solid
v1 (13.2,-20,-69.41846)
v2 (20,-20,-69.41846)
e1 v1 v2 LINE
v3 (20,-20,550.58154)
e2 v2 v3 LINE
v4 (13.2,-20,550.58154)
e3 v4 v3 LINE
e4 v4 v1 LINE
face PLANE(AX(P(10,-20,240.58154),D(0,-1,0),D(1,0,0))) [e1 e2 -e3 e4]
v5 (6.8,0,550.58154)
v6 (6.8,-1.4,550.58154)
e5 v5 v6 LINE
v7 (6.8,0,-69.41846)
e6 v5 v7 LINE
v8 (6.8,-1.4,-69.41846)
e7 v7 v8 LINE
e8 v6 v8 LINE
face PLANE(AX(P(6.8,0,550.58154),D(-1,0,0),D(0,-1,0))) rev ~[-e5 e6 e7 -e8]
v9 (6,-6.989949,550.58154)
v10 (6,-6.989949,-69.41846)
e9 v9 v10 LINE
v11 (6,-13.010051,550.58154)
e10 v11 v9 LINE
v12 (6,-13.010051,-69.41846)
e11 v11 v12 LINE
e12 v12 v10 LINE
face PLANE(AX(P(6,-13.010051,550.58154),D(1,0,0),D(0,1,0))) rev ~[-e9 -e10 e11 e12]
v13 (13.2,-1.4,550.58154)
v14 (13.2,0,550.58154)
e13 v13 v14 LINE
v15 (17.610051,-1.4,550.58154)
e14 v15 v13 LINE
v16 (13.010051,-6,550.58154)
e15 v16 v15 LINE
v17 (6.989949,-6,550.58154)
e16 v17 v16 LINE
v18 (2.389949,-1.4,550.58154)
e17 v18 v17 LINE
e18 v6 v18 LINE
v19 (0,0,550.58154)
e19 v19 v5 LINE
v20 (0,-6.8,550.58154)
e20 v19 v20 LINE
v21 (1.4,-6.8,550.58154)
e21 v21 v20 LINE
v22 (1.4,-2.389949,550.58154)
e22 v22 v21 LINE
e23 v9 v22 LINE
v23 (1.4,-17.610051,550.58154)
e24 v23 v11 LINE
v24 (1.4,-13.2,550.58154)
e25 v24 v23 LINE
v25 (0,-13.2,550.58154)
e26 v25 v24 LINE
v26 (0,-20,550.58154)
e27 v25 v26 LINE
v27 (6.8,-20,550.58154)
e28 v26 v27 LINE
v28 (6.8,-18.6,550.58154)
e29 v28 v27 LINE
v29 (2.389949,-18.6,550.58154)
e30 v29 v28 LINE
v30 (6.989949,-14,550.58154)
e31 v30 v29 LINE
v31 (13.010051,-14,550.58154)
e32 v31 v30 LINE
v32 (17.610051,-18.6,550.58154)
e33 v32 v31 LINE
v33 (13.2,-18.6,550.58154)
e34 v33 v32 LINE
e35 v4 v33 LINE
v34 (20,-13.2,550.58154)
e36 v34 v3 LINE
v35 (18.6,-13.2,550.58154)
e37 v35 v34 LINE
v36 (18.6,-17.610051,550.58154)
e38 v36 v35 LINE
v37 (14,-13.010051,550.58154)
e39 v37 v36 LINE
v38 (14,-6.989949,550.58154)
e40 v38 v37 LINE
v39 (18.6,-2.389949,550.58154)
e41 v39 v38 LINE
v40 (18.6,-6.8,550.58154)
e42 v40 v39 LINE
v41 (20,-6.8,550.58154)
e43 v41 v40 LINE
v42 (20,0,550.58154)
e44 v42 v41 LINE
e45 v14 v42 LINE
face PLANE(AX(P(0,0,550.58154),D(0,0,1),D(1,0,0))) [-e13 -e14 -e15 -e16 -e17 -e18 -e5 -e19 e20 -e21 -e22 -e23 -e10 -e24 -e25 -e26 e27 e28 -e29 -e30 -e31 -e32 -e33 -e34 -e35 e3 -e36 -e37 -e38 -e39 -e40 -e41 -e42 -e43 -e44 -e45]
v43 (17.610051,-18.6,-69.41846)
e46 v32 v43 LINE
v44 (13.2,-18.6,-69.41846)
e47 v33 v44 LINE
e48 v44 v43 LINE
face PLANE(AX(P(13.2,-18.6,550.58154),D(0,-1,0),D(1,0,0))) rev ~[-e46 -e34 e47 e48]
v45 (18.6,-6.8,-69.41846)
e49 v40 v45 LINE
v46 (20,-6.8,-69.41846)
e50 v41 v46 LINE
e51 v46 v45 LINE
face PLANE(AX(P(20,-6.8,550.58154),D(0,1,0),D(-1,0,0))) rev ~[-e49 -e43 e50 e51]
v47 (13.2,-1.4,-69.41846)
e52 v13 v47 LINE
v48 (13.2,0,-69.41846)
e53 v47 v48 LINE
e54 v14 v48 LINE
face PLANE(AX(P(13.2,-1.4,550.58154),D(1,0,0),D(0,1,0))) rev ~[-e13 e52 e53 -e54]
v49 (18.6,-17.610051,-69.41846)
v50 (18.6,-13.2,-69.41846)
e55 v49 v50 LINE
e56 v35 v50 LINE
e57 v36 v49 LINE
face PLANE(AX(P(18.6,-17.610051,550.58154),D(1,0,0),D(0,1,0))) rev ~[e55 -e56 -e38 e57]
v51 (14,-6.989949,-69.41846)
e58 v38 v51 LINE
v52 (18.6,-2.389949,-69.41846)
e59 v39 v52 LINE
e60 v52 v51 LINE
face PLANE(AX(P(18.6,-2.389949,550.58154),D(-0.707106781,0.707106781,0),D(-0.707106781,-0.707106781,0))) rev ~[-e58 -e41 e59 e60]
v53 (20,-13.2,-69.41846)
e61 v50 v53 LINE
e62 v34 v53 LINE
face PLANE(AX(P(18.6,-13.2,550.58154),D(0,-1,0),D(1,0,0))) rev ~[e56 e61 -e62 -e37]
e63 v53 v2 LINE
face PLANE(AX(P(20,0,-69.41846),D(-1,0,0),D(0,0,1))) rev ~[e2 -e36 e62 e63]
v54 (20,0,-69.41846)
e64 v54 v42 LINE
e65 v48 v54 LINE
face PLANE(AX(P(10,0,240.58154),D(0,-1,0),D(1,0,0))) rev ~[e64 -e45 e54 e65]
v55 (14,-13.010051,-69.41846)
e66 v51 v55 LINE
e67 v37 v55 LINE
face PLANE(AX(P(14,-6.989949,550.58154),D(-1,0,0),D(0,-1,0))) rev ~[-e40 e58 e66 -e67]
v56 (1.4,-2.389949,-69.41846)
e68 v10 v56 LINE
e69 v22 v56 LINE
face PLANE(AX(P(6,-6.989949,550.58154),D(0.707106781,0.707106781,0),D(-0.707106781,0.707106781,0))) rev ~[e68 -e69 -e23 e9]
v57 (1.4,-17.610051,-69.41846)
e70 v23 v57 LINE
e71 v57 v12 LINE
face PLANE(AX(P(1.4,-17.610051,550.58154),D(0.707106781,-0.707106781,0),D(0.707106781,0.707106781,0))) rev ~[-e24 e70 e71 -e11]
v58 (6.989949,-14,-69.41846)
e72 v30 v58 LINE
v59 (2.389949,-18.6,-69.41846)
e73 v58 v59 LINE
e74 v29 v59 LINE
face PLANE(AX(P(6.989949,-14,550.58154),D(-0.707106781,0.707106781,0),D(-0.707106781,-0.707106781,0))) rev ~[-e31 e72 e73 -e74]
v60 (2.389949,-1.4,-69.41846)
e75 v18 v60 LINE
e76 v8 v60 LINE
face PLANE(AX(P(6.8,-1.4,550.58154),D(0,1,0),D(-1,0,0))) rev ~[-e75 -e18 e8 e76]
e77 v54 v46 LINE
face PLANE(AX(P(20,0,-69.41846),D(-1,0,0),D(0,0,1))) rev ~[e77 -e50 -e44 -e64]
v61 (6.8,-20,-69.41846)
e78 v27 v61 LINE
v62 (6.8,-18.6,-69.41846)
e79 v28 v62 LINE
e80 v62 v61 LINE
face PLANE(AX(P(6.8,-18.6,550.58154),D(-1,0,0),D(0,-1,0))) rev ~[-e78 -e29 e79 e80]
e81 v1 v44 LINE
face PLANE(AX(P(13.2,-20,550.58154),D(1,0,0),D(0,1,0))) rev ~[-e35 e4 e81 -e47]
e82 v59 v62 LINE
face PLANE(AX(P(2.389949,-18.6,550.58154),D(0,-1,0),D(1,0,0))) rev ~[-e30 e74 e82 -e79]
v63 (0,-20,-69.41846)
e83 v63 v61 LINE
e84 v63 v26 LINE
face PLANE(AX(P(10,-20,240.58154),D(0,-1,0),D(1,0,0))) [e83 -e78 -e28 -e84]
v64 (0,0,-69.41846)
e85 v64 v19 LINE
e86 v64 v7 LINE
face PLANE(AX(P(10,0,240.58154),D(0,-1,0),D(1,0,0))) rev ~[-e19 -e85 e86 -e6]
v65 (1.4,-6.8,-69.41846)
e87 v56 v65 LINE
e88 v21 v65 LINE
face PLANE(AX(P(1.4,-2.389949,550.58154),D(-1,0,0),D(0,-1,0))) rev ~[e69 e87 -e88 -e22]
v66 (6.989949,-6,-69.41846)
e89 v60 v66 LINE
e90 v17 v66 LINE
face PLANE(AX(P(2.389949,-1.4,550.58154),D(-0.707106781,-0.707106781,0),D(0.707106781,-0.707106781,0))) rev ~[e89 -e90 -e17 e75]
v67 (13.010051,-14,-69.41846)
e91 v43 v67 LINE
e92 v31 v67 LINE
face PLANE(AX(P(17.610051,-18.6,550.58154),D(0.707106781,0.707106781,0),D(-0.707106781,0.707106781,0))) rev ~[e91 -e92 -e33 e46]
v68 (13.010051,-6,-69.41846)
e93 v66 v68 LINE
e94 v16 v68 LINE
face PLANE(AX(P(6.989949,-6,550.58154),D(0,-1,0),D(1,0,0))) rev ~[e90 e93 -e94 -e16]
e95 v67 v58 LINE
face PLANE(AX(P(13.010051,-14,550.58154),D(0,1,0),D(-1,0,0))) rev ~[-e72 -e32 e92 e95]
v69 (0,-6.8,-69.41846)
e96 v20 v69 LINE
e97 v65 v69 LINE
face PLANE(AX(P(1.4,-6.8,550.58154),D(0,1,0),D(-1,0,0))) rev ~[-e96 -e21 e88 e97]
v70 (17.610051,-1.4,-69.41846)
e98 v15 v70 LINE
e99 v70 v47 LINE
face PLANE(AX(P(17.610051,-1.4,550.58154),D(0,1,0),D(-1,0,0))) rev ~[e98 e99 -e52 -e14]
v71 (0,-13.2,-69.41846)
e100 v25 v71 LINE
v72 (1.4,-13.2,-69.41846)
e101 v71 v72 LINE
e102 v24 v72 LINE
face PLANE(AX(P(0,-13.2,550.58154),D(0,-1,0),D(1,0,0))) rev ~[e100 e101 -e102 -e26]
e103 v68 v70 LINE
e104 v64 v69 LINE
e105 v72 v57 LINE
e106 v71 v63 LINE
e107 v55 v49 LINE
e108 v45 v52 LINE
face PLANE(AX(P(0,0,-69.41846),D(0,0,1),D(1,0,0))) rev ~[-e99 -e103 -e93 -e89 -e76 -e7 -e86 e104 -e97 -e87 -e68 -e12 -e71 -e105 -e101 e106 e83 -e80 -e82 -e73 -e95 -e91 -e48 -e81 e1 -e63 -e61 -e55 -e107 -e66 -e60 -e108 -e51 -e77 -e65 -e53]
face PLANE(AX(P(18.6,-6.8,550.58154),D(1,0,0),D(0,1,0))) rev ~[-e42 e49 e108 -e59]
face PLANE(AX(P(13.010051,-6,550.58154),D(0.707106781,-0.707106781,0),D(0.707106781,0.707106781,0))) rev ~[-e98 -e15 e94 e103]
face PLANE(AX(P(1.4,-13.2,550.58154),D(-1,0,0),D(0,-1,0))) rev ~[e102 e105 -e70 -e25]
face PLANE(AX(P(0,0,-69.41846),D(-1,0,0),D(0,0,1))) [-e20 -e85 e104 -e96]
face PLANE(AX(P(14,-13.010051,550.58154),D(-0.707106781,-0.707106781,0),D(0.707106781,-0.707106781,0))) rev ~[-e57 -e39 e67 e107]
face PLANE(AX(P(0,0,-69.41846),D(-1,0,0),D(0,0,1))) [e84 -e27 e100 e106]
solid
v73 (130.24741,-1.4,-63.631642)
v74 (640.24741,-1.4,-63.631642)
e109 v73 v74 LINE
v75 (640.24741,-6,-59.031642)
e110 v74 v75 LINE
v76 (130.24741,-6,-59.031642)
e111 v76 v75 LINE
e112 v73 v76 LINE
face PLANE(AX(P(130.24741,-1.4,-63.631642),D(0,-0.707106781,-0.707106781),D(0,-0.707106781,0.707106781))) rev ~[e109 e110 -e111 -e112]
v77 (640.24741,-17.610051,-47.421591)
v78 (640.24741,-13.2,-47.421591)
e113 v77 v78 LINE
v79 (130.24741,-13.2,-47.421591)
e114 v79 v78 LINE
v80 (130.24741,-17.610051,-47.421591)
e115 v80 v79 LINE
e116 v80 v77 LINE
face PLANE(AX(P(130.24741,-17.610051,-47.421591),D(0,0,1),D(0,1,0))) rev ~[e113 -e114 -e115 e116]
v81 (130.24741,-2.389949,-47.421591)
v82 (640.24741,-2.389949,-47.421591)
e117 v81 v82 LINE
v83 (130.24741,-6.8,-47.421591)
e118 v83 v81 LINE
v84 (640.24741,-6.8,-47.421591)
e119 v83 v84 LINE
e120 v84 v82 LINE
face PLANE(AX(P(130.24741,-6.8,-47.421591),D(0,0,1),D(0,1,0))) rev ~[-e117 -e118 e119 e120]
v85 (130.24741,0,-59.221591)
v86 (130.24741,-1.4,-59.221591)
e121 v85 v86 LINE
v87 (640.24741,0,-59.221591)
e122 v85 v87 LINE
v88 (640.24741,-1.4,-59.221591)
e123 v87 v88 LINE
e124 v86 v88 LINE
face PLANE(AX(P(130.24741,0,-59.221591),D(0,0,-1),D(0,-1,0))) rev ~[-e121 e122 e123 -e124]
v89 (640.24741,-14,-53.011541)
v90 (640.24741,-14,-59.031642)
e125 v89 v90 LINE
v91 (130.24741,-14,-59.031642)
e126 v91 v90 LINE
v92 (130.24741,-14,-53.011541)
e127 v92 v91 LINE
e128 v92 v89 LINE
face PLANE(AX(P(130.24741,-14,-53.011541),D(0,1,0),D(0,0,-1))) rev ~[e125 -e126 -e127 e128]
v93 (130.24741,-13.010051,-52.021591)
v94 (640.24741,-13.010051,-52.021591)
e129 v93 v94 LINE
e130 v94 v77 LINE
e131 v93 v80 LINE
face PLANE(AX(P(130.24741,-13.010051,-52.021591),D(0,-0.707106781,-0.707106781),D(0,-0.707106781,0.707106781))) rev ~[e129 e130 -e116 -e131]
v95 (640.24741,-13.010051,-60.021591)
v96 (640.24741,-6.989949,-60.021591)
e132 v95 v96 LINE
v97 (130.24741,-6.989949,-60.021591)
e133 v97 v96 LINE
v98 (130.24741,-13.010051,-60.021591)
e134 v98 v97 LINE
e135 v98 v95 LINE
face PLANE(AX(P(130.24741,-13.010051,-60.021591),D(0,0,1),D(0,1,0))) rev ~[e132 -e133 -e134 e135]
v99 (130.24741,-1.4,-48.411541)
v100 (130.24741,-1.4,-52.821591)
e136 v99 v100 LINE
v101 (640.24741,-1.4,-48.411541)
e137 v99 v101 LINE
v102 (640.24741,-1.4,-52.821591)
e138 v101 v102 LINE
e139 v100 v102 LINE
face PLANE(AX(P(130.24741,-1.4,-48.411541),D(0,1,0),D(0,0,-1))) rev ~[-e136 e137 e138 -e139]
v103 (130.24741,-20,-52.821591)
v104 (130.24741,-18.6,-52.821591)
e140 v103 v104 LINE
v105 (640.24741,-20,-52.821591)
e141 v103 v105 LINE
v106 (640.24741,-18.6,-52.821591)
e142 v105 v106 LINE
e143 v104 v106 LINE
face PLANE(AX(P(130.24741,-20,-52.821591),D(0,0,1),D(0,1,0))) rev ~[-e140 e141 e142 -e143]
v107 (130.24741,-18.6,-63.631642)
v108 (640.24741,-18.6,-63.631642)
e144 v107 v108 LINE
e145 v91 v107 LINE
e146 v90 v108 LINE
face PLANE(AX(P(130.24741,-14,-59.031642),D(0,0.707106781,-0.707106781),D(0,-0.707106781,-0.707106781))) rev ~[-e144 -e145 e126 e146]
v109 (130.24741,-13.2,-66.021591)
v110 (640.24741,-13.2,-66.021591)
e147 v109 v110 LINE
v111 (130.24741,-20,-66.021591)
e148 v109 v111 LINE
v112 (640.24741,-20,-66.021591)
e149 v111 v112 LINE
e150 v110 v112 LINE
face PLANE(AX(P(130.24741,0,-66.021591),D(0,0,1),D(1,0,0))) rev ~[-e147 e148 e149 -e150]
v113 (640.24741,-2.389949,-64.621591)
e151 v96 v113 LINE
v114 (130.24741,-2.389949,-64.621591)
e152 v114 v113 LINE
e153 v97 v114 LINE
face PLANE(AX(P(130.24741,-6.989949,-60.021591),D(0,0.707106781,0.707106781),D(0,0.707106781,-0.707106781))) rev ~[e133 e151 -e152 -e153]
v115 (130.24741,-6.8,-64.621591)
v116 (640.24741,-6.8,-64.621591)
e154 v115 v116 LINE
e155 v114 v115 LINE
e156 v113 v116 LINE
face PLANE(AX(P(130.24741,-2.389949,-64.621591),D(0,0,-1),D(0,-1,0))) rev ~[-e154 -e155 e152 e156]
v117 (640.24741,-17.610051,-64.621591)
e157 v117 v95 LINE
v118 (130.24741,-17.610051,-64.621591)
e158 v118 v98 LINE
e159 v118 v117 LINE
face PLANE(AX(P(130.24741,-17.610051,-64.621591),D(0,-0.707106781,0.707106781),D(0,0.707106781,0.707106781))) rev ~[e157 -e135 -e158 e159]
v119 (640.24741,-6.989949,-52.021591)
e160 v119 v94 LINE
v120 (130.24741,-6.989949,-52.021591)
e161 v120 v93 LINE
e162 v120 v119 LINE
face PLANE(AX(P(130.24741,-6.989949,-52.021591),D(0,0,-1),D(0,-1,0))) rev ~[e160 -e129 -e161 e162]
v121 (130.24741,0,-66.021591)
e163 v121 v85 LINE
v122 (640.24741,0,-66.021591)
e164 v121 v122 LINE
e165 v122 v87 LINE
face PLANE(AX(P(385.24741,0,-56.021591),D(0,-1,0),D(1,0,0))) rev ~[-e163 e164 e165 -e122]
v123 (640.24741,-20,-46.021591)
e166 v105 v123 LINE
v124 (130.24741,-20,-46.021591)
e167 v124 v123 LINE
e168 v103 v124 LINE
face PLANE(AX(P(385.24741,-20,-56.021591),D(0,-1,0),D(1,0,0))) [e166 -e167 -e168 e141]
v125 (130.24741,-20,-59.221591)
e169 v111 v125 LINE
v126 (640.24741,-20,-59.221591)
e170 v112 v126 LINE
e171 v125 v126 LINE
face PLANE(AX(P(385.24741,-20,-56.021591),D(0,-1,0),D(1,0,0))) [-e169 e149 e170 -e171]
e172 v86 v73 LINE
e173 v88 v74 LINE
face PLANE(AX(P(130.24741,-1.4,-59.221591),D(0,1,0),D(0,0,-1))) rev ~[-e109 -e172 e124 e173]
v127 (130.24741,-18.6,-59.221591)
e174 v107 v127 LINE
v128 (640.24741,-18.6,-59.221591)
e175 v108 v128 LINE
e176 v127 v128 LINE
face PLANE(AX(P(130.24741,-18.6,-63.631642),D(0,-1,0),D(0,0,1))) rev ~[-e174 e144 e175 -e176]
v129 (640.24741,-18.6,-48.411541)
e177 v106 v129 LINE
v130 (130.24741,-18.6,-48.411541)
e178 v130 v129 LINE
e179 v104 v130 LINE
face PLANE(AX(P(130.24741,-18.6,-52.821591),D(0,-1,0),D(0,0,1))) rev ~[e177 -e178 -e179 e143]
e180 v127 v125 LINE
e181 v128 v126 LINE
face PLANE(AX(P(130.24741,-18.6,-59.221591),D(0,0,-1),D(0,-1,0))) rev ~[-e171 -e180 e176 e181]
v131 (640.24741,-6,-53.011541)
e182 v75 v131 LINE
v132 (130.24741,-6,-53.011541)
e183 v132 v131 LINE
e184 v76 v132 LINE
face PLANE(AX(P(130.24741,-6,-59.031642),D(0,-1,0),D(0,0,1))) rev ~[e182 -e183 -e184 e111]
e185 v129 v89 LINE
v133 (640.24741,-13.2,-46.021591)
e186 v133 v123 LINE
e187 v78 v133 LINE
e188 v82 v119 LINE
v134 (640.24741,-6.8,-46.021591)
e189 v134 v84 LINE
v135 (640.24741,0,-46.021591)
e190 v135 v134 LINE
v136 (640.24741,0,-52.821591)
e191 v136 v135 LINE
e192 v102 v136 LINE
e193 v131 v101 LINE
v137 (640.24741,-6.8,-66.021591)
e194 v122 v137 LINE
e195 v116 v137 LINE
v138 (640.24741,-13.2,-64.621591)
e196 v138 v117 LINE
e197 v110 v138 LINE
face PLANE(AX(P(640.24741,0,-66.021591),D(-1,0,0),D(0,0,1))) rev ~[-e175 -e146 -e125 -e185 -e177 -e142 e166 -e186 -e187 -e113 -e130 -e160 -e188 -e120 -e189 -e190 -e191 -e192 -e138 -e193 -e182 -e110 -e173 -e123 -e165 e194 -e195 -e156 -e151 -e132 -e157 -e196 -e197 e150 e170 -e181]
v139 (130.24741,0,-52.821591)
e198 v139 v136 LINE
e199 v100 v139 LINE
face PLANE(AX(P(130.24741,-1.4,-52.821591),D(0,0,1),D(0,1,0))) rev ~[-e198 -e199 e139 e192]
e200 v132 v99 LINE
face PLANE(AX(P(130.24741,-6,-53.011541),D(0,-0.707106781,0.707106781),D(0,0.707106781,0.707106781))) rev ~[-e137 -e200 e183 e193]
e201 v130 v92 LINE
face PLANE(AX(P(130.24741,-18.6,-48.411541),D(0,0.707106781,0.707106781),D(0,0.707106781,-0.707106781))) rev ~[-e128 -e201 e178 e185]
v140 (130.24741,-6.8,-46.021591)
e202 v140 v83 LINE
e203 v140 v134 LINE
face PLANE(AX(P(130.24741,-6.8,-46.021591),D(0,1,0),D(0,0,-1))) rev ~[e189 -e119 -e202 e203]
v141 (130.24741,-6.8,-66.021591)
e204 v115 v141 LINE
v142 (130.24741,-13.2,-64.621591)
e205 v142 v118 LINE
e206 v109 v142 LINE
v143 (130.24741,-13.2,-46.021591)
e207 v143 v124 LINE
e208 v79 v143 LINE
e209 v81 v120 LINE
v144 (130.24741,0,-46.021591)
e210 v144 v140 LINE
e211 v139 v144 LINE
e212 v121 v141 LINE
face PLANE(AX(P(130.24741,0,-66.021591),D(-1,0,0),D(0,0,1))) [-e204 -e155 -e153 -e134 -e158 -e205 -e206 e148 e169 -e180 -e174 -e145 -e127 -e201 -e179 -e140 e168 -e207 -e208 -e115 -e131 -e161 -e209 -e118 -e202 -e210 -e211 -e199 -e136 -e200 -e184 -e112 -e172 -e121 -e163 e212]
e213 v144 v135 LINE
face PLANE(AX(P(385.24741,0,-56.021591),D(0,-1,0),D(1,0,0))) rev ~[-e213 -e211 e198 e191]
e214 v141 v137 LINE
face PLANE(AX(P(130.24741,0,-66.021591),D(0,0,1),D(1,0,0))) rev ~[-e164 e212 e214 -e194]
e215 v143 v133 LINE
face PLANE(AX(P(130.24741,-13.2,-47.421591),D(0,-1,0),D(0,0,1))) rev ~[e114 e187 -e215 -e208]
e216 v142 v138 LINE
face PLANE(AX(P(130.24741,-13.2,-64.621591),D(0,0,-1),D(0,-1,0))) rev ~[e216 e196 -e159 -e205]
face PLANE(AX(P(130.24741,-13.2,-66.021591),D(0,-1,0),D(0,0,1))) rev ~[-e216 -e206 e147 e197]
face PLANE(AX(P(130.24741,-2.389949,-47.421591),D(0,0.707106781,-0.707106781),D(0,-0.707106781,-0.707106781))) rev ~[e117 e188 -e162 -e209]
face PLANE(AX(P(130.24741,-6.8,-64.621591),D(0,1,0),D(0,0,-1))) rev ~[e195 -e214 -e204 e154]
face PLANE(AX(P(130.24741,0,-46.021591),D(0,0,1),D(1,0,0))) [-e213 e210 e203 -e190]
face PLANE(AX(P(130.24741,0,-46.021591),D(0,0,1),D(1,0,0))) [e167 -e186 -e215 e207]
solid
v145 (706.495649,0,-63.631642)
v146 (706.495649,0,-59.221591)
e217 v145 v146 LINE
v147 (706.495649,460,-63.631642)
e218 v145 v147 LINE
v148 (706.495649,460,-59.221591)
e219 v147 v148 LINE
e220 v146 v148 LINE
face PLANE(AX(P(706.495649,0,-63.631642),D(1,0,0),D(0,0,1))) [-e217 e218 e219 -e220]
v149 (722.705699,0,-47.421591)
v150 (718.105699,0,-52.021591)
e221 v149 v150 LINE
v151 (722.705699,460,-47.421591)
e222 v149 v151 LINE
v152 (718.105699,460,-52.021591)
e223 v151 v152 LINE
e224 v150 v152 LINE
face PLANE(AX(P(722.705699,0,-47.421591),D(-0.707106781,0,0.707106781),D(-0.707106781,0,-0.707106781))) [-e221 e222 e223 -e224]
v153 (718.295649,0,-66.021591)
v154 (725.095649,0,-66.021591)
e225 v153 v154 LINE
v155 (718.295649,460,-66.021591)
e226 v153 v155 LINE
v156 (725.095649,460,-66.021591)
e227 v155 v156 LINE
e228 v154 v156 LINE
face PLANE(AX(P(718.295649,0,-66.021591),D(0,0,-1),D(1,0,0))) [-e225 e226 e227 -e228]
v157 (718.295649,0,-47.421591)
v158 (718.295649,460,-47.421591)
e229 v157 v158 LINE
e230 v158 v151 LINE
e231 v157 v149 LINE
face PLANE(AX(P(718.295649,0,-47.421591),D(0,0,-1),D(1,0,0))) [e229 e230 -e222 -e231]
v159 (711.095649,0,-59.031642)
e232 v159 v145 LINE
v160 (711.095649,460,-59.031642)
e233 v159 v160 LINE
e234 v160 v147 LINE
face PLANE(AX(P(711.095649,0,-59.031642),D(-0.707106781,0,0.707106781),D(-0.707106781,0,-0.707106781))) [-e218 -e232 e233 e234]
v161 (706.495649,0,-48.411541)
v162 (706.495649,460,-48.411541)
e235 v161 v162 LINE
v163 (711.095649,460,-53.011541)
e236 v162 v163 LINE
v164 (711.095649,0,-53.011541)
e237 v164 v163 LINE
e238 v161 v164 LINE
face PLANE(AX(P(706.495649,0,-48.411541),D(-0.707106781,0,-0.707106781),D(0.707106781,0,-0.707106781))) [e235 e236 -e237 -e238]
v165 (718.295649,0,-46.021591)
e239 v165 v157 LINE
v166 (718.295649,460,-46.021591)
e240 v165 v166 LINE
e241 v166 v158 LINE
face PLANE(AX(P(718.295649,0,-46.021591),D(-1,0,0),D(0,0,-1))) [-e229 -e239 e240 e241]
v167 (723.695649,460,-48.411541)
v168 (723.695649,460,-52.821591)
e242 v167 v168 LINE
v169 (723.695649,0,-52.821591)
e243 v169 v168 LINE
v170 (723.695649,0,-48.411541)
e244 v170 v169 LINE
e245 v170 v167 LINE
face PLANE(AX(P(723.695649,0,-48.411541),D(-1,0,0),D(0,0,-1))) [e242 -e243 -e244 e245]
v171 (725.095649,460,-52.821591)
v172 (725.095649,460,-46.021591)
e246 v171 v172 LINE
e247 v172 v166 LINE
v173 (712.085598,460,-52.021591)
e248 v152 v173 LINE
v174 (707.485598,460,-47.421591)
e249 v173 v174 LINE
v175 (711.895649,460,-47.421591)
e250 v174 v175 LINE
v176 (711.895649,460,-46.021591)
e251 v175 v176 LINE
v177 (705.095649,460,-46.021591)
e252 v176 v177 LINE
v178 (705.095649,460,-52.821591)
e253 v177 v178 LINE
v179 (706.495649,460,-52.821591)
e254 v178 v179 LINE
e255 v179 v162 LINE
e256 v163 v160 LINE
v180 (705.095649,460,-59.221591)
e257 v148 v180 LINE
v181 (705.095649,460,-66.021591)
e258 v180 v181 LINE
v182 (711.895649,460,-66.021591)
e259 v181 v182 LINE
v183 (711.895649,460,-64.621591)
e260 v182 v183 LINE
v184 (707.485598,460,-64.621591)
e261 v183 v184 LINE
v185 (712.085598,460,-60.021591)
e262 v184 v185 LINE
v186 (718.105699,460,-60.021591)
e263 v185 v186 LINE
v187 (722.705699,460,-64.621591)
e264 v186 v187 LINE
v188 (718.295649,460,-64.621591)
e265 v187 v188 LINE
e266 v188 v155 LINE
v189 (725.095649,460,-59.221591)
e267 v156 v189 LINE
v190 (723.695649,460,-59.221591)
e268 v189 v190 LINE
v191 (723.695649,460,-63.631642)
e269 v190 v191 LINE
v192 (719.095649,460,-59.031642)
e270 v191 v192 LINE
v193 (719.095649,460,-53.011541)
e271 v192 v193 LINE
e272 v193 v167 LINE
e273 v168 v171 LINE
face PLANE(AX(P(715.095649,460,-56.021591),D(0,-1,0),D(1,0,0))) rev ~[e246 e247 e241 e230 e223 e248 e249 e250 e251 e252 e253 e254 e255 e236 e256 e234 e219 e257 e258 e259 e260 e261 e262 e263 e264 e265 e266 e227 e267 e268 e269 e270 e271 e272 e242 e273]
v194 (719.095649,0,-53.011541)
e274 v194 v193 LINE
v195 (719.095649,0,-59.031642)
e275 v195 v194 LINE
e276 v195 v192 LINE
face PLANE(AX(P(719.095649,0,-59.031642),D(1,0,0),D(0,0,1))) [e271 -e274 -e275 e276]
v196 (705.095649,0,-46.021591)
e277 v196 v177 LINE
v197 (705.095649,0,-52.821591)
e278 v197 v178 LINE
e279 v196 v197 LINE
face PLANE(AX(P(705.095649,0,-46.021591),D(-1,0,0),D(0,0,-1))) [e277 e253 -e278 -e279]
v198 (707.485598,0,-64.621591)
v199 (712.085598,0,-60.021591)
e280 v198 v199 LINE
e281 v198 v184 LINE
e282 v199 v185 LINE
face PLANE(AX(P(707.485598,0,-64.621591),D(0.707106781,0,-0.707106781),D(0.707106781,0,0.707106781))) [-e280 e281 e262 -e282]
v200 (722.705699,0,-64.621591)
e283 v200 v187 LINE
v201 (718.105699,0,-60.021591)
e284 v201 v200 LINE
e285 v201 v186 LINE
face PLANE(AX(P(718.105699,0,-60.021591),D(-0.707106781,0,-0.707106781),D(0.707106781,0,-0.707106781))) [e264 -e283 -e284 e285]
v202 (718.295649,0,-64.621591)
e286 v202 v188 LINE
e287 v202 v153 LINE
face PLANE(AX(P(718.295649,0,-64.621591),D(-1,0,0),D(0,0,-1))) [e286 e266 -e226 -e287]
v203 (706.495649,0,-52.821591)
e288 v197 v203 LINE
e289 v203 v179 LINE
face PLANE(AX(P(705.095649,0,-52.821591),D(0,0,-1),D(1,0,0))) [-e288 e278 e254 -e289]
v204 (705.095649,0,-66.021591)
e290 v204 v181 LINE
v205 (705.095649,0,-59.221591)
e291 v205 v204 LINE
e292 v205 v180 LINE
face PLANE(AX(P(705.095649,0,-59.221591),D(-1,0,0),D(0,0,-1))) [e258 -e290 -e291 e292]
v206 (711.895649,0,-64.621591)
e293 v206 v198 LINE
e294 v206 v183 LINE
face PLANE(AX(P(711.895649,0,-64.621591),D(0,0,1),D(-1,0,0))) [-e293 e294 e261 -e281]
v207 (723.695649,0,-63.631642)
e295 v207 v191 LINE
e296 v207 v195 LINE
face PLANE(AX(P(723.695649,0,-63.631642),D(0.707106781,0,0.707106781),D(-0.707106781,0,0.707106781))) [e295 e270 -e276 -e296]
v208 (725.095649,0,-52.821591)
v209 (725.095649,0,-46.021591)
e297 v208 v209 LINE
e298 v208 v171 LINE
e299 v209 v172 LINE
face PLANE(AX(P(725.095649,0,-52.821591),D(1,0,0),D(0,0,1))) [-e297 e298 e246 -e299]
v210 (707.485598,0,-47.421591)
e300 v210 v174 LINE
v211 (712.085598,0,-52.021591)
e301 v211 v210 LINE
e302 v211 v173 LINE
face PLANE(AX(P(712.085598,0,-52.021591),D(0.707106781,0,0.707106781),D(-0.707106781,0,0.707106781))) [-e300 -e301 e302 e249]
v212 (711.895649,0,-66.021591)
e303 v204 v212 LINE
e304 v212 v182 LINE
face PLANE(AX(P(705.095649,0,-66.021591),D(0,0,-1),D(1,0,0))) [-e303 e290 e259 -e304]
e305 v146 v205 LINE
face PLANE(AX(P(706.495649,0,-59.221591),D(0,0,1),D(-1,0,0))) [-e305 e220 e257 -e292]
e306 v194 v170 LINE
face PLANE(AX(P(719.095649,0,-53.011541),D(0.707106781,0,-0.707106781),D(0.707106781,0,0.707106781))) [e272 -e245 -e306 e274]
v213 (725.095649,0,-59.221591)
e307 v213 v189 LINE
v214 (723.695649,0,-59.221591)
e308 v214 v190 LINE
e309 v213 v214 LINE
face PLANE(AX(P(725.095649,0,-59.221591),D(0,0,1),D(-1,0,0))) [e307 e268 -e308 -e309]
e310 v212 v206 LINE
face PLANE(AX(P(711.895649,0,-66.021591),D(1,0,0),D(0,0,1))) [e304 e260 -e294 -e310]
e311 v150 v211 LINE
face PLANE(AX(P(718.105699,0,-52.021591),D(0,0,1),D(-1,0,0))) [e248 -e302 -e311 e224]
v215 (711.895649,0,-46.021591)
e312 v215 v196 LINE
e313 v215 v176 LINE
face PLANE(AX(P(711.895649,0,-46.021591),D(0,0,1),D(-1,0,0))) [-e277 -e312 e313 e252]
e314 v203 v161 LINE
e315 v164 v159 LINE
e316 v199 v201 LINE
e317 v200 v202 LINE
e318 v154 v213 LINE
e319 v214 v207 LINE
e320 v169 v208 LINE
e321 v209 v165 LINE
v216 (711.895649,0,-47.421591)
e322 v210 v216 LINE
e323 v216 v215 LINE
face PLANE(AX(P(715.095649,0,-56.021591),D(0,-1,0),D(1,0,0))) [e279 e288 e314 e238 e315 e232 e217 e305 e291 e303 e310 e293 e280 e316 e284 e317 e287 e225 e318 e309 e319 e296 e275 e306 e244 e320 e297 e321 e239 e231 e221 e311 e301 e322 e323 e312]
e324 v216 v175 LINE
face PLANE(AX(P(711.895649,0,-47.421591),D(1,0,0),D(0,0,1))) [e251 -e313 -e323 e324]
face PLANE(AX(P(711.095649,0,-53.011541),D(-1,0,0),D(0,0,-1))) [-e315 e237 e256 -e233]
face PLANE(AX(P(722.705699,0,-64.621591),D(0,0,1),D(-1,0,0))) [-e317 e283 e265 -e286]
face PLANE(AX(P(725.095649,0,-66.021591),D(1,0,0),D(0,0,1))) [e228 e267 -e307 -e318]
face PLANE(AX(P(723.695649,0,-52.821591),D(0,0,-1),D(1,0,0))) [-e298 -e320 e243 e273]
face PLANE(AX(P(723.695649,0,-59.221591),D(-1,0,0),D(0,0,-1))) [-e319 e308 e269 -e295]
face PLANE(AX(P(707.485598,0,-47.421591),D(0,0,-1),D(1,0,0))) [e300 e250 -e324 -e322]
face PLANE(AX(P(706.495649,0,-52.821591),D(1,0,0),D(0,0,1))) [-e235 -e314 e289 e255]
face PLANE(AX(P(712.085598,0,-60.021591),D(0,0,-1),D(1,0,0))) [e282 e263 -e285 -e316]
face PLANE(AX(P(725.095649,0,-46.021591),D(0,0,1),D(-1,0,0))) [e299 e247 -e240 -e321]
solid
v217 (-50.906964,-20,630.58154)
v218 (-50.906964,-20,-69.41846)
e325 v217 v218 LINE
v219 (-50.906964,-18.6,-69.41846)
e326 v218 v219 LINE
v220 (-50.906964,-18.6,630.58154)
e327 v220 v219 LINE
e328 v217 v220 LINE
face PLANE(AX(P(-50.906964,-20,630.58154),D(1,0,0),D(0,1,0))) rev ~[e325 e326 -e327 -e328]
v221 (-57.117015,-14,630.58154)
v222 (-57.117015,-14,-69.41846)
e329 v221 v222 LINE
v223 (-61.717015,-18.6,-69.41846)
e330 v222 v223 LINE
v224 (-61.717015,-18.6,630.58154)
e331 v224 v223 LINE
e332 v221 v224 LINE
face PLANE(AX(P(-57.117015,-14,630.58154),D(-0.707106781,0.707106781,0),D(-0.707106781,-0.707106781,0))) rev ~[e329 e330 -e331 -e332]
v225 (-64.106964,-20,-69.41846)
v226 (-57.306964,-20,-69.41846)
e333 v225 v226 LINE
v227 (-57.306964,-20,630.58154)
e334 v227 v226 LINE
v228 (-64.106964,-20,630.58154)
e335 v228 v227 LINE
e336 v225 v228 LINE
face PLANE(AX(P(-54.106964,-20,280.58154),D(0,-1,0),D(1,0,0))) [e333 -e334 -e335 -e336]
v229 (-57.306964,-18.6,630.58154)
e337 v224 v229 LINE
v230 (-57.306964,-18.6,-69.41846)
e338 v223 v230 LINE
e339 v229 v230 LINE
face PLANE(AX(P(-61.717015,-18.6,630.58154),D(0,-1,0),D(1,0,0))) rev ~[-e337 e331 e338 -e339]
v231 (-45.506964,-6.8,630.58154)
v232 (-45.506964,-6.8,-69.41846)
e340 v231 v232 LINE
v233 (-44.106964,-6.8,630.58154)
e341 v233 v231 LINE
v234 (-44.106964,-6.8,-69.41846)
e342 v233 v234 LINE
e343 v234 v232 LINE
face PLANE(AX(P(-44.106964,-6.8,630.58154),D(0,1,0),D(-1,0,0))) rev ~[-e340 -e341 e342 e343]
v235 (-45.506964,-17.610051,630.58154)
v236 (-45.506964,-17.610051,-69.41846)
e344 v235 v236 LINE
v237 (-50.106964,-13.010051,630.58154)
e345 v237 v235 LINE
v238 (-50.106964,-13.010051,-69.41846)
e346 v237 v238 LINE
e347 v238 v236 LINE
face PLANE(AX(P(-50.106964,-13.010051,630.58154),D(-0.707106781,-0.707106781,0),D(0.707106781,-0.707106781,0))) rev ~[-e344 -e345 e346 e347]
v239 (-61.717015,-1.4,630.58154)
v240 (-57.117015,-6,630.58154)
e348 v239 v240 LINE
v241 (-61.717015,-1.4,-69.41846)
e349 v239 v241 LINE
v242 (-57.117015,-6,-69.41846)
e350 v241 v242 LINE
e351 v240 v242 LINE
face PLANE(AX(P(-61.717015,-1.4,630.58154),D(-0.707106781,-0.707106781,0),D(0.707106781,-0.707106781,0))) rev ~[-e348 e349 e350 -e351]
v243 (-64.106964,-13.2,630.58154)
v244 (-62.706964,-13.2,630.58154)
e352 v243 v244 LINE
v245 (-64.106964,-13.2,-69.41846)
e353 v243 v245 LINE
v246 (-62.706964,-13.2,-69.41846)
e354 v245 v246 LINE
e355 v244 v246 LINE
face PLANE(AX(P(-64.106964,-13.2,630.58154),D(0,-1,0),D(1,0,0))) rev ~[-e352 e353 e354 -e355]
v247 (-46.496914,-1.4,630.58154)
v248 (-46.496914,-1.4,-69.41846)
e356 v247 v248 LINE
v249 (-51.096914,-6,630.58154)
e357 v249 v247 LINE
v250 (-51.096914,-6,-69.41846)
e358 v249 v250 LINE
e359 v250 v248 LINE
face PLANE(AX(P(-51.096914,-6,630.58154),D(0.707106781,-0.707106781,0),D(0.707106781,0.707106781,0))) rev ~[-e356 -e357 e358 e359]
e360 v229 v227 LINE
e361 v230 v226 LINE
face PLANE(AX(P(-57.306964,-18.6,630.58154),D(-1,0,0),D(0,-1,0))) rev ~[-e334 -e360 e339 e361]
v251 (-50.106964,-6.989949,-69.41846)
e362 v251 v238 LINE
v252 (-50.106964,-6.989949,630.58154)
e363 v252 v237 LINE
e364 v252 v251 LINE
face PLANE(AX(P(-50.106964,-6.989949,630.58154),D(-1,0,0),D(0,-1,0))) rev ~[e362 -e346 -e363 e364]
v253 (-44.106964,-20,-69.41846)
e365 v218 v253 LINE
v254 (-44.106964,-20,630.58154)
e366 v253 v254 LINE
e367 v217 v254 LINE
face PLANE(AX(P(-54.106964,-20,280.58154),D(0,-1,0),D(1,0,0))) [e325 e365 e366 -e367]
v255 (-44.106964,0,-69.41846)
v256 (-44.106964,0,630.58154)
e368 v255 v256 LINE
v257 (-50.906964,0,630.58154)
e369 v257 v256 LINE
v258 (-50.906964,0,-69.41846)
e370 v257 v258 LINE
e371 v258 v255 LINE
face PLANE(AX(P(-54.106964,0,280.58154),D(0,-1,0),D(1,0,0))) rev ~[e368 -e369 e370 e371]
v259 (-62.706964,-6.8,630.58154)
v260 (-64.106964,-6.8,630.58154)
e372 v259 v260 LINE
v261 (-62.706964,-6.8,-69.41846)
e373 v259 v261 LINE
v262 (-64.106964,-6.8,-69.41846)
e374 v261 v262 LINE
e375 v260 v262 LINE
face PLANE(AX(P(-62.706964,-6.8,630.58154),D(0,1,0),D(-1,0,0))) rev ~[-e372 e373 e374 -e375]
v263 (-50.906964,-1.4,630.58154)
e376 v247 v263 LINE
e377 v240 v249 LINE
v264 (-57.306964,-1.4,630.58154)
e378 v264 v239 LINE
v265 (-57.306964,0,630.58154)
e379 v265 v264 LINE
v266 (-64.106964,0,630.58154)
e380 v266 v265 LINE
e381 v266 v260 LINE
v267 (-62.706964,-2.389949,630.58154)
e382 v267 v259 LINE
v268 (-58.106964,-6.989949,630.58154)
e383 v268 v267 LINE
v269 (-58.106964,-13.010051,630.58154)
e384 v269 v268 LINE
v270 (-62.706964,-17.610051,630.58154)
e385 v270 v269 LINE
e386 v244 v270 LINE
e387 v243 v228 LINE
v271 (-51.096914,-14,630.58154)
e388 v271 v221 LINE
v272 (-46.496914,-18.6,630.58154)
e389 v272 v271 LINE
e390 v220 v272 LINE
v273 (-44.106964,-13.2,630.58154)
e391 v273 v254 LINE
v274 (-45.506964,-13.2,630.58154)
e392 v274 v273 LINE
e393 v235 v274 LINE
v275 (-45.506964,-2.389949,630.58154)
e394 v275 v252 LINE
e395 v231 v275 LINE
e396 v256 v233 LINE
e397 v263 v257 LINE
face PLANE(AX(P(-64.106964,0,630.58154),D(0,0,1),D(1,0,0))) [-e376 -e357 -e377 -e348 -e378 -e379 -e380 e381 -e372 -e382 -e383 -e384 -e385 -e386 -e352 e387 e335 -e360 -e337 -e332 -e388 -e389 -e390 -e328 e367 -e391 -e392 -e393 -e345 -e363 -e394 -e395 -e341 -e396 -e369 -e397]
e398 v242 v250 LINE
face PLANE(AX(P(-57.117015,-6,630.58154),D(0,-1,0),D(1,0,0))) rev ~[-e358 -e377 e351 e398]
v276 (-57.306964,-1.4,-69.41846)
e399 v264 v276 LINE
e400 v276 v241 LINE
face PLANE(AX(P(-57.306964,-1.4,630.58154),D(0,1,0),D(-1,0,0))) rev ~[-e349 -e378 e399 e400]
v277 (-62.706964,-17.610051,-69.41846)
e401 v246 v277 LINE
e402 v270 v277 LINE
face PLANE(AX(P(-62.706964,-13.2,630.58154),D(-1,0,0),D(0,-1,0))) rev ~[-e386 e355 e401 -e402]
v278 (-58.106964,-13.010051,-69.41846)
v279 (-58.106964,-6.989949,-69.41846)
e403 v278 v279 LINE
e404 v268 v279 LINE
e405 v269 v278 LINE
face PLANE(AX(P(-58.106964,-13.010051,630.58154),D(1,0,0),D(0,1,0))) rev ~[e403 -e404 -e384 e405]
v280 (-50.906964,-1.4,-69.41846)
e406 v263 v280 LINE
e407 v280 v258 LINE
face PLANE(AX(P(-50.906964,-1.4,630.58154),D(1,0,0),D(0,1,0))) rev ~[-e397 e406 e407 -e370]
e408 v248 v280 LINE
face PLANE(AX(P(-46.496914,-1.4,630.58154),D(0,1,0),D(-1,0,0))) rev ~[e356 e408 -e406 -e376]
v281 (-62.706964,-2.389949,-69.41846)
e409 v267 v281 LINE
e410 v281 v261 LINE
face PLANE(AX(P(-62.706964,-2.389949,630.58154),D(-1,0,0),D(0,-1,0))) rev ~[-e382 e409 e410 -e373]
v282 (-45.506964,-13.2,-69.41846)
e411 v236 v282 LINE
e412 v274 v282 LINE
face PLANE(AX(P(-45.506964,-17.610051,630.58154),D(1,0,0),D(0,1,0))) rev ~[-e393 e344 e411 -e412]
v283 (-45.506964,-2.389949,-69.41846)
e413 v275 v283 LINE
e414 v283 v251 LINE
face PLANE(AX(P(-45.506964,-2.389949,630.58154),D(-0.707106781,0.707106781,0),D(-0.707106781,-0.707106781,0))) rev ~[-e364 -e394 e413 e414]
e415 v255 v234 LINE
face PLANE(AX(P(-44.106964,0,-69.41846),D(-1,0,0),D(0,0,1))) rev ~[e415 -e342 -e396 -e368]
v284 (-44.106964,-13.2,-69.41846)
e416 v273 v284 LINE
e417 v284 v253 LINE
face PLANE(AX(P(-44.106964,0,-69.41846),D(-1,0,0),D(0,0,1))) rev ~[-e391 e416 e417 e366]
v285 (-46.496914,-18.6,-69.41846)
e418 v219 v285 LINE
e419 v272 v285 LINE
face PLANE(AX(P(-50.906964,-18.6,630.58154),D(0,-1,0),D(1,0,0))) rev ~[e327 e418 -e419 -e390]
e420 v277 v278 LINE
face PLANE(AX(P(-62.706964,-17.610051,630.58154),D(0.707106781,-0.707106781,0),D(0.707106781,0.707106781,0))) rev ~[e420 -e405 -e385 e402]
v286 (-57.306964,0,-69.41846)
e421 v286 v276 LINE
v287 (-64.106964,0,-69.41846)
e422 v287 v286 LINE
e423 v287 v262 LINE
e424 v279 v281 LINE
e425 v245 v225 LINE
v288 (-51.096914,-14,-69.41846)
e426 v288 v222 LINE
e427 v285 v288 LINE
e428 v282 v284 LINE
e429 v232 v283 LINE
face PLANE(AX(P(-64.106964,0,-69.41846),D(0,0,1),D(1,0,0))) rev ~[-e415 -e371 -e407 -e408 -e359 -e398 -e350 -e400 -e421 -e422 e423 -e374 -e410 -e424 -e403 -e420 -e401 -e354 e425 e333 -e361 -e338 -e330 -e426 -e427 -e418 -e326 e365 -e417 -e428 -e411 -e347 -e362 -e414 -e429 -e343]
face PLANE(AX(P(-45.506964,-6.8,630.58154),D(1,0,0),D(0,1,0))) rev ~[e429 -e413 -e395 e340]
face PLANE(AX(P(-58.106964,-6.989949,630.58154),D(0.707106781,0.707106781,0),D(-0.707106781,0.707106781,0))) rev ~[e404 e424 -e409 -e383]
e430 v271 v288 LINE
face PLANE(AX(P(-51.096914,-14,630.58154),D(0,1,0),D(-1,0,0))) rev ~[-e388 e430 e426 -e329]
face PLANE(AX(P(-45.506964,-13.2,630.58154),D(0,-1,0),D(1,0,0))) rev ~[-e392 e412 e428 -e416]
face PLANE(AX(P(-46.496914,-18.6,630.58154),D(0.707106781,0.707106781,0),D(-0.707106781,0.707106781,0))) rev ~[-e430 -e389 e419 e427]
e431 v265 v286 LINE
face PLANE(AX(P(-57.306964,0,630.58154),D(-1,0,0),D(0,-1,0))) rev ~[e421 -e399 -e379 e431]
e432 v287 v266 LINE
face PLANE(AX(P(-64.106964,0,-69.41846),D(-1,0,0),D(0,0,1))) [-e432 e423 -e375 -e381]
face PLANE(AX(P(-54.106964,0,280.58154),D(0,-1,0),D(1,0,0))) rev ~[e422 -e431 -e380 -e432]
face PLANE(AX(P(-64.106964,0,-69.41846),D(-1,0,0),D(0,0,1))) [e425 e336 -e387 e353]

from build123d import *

# Parameters (mm, degrees)
F0_W     = 20
F0_H     = 700
F1_DEPTH = 20
F0_W_2   = 510
F0_H_2   = 20
F0_H_3   = 620
F2_DEPTH = 460
F4_DEPTH = 620
F6_DEPTH = 700
F8_DEPTH = 510


# Not quite as in the source:
# - a feature names something its author has since deleted; it is built from what else it names


with BuildPart() as f1:
    # F0 (on Front) → F1 (new body)
    with BuildSketch(Plane.XZ):
        with Locations((-54.1069640219, 280.5815398693)):
            Rectangle(F0_W, F0_H)
    extrude(amount=F1_DEPTH)

    # F5 (on face) → F6 (cut, through all)
    with BuildSketch(Plane.XY.offset(630.5815398693)):
        Polygon((-62.7069640219, -6.8), (-64.1069640219, -6.8), (-64.1069640219, -13.2), (-62.7069640219, -13.2), (-62.7069640219, -17.6100505063), (-58.1069640219, -13.0100505063), (-58.1069640219, -10), (-58.1069640219, -6.9899494937), (-62.7069640219, -2.3899494937), align=None)
        Polygon((-50.9069640219, 0), (-57.3069640219, 0), (-57.3069640219, -1.4), (-61.7170145283, -1.4), (-57.1170145283, -6), (-54.1069640219, -6), (-51.0969135156, -6), (-46.4969135156, -1.4), (-50.9069640219, -1.4), align=None)
        Polygon((-44.1069640219, -13.2), (-44.1069640219, -6.8), (-45.5069640219, -6.8), (-45.5069640219, -2.3899494937), (-50.1069640219, -6.9899494937), (-50.1069640219, -10), (-50.1069640219, -13.0100505063), (-45.5069640219, -17.6100505063), (-45.5069640219, -13.2), align=None)
        Polygon((-57.3069640219, -18.6), (-57.3069640219, -20), (-50.9069640219, -20), (-50.9069640219, -18.6), (-46.4969135156, -18.6), (-51.0969135156, -14), (-54.1069640219, -14), (-57.1170145283, -14), (-61.7170145283, -18.6), align=None)
    extrude(amount=-F6_DEPTH, mode=Mode.SUBTRACT)


with BuildPart() as f1b:
    # F0 (on Front) → F1, piece 2 (new body)
    with BuildSketch(Plane.XZ):
        with Locations((385.2474099398, -56.0215914249)):
            Rectangle(F0_W_2, F0_H_2)
    extrude(amount=F1_DEPTH)

    # F7 (on face) → F8 (cut, through all)
    with BuildSketch(Plane(origin=(130.2474099398, 0, 0), x_dir=(0, -1, 0), z_dir=(-1, 0, 0))):
        Polygon((13.2, -46.0215914249), (6.8, -46.0215914249), (6.8, -47.4215914249), (2.3899494937, -47.4215914249), (6.9899494937, -52.0215914249), (10, -52.0215914249), (13.0100505063, -52.0215914249), (17.6100505063, -47.4215914249), (13.2, -47.4215914249), align=None)
        Polygon((20, -59.2215914249), (20, -52.8215914249), (18.6, -52.8215914249), (18.6, -48.4115409186), (14, -53.0115409186), (14, -56.0215914249), (14, -59.0316419313), (18.6, -63.6316419313), (18.6, -59.2215914249), align=None)
        Polygon((6.8, -64.6215914249), (6.8, -66.0215914249), (13.2, -66.0215914249), (13.2, -64.6215914249), (17.6100505063, -64.6215914249), (13.0100505063, -60.0215914249), (10, -60.0215914249), (6.9899494937, -60.0215914249), (2.3899494937, -64.6215914249), align=None)
        Polygon((1.4, -52.8215914249), (0, -52.8215914249), (0, -59.2215914249), (1.4, -59.2215914249), (1.4, -63.6316419313), (6, -59.0316419313), (6, -56.0215914249), (6, -53.0115409186), (1.4, -48.4115409186), align=None)
    extrude(amount=-F8_DEPTH, mode=Mode.SUBTRACT)


with BuildPart() as f1c:
    # F0 (on Front) → F1, piece 3 (new body)
    with BuildSketch(Plane.XZ):
        with Locations((10, 240.5815398693)):
            Rectangle(F0_W, F0_H_3)
    extrude(amount=F1_DEPTH)

    # F3 (on face) → F4 (cut, through all)
    with BuildSketch(Plane.XY.offset(550.5815398693)):
        Polygon((13.2, 0), (6.8, 0), (6.8, -1.4), (2.3899494937, -1.4), (6.9899494937, -6), (10, -6), (13.0100505063, -6), (17.6100505063, -1.4), (13.2, -1.4), align=None)
        Polygon((20, -13.2), (20, -6.8), (18.6, -6.8), (18.6, -2.3899494937), (14, -6.9899494937), (14, -10), (14, -13.0100505063), (18.6, -17.6100505063), (18.6, -13.2), align=None)
        Polygon((6.8, -18.6), (6.8, -20), (13.2, -20), (13.2, -18.6), (17.6100505063, -18.6), (13.0100505063, -14), (10, -14), (6.9899494937, -14), (2.3899494937, -18.6), align=None)
        Polygon((1.4, -6.8), (0, -6.8), (0, -13.2), (1.4, -13.2), (1.4, -17.6100505063), (6, -13.0100505063), (6, -10), (6, -6.9899494937), (1.4, -2.3899494937), align=None)
    extrude(amount=-F4_DEPTH, mode=Mode.SUBTRACT)


with BuildPart() as f2:
    # F0 (on Front) → F2 (new body)
    with BuildSketch(Plane.XZ):
        Polygon((705.0956487656, -59.2215914249), (705.0956487656, -66.0215914249), (711.8956487656, -66.0215914249), (711.8956487656, -64.6215914249), (707.4855982592, -64.6215914249), (712.0855982592, -60.0215914249), (715.0956487656, -60.0215914249), (718.1056992719, -60.0215914249), (722.7056992719, -64.6215914249), (718.2956487656, -64.6215914249), (718.2956487656, -66.0215914249), (725.0956487656, -66.0215914249), (725.0956487656, -59.2215914249), (723.6956487656, -59.2215914249), (723.6956487656, -63.6316419313), (719.0956487656, -59.0316419313), (719.0956487656, -56.0215914249), (719.0956487656, -53.0115409186), (723.6956487656, -48.4115409186), (723.6956487656, -52.8215914249), (725.0956487656, -52.8215914249), (725.0956487656, -46.0215914249), (718.2956487656, -46.0215914249), (718.2956487656, -47.4215914249), (722.7056992719, -47.4215914249), (718.1056992719, -52.0215914249), (715.0956487656, -52.0215914249), (712.0855982592, -52.0215914249), (707.4855982592, -47.4215914249), (711.8956487656, -47.4215914249), (711.8956487656, -46.0215914249), (705.0956487656, -46.0215914249), (705.0956487656, -52.8215914249), (706.4956487656, -52.8215914249), (706.4956487656, -48.4115409186), (711.0956487656, -53.0115409186), (711.0956487656, -56.0215914249), (711.0956487656, -59.0316419313), (706.4956487656, -63.6316419313), (706.4956487656, -59.2215914249), align=None)
    extrude(amount=-F2_DEPTH)


solid = Compound([f1.part, f1b.part, f1c.part, f2.part])
